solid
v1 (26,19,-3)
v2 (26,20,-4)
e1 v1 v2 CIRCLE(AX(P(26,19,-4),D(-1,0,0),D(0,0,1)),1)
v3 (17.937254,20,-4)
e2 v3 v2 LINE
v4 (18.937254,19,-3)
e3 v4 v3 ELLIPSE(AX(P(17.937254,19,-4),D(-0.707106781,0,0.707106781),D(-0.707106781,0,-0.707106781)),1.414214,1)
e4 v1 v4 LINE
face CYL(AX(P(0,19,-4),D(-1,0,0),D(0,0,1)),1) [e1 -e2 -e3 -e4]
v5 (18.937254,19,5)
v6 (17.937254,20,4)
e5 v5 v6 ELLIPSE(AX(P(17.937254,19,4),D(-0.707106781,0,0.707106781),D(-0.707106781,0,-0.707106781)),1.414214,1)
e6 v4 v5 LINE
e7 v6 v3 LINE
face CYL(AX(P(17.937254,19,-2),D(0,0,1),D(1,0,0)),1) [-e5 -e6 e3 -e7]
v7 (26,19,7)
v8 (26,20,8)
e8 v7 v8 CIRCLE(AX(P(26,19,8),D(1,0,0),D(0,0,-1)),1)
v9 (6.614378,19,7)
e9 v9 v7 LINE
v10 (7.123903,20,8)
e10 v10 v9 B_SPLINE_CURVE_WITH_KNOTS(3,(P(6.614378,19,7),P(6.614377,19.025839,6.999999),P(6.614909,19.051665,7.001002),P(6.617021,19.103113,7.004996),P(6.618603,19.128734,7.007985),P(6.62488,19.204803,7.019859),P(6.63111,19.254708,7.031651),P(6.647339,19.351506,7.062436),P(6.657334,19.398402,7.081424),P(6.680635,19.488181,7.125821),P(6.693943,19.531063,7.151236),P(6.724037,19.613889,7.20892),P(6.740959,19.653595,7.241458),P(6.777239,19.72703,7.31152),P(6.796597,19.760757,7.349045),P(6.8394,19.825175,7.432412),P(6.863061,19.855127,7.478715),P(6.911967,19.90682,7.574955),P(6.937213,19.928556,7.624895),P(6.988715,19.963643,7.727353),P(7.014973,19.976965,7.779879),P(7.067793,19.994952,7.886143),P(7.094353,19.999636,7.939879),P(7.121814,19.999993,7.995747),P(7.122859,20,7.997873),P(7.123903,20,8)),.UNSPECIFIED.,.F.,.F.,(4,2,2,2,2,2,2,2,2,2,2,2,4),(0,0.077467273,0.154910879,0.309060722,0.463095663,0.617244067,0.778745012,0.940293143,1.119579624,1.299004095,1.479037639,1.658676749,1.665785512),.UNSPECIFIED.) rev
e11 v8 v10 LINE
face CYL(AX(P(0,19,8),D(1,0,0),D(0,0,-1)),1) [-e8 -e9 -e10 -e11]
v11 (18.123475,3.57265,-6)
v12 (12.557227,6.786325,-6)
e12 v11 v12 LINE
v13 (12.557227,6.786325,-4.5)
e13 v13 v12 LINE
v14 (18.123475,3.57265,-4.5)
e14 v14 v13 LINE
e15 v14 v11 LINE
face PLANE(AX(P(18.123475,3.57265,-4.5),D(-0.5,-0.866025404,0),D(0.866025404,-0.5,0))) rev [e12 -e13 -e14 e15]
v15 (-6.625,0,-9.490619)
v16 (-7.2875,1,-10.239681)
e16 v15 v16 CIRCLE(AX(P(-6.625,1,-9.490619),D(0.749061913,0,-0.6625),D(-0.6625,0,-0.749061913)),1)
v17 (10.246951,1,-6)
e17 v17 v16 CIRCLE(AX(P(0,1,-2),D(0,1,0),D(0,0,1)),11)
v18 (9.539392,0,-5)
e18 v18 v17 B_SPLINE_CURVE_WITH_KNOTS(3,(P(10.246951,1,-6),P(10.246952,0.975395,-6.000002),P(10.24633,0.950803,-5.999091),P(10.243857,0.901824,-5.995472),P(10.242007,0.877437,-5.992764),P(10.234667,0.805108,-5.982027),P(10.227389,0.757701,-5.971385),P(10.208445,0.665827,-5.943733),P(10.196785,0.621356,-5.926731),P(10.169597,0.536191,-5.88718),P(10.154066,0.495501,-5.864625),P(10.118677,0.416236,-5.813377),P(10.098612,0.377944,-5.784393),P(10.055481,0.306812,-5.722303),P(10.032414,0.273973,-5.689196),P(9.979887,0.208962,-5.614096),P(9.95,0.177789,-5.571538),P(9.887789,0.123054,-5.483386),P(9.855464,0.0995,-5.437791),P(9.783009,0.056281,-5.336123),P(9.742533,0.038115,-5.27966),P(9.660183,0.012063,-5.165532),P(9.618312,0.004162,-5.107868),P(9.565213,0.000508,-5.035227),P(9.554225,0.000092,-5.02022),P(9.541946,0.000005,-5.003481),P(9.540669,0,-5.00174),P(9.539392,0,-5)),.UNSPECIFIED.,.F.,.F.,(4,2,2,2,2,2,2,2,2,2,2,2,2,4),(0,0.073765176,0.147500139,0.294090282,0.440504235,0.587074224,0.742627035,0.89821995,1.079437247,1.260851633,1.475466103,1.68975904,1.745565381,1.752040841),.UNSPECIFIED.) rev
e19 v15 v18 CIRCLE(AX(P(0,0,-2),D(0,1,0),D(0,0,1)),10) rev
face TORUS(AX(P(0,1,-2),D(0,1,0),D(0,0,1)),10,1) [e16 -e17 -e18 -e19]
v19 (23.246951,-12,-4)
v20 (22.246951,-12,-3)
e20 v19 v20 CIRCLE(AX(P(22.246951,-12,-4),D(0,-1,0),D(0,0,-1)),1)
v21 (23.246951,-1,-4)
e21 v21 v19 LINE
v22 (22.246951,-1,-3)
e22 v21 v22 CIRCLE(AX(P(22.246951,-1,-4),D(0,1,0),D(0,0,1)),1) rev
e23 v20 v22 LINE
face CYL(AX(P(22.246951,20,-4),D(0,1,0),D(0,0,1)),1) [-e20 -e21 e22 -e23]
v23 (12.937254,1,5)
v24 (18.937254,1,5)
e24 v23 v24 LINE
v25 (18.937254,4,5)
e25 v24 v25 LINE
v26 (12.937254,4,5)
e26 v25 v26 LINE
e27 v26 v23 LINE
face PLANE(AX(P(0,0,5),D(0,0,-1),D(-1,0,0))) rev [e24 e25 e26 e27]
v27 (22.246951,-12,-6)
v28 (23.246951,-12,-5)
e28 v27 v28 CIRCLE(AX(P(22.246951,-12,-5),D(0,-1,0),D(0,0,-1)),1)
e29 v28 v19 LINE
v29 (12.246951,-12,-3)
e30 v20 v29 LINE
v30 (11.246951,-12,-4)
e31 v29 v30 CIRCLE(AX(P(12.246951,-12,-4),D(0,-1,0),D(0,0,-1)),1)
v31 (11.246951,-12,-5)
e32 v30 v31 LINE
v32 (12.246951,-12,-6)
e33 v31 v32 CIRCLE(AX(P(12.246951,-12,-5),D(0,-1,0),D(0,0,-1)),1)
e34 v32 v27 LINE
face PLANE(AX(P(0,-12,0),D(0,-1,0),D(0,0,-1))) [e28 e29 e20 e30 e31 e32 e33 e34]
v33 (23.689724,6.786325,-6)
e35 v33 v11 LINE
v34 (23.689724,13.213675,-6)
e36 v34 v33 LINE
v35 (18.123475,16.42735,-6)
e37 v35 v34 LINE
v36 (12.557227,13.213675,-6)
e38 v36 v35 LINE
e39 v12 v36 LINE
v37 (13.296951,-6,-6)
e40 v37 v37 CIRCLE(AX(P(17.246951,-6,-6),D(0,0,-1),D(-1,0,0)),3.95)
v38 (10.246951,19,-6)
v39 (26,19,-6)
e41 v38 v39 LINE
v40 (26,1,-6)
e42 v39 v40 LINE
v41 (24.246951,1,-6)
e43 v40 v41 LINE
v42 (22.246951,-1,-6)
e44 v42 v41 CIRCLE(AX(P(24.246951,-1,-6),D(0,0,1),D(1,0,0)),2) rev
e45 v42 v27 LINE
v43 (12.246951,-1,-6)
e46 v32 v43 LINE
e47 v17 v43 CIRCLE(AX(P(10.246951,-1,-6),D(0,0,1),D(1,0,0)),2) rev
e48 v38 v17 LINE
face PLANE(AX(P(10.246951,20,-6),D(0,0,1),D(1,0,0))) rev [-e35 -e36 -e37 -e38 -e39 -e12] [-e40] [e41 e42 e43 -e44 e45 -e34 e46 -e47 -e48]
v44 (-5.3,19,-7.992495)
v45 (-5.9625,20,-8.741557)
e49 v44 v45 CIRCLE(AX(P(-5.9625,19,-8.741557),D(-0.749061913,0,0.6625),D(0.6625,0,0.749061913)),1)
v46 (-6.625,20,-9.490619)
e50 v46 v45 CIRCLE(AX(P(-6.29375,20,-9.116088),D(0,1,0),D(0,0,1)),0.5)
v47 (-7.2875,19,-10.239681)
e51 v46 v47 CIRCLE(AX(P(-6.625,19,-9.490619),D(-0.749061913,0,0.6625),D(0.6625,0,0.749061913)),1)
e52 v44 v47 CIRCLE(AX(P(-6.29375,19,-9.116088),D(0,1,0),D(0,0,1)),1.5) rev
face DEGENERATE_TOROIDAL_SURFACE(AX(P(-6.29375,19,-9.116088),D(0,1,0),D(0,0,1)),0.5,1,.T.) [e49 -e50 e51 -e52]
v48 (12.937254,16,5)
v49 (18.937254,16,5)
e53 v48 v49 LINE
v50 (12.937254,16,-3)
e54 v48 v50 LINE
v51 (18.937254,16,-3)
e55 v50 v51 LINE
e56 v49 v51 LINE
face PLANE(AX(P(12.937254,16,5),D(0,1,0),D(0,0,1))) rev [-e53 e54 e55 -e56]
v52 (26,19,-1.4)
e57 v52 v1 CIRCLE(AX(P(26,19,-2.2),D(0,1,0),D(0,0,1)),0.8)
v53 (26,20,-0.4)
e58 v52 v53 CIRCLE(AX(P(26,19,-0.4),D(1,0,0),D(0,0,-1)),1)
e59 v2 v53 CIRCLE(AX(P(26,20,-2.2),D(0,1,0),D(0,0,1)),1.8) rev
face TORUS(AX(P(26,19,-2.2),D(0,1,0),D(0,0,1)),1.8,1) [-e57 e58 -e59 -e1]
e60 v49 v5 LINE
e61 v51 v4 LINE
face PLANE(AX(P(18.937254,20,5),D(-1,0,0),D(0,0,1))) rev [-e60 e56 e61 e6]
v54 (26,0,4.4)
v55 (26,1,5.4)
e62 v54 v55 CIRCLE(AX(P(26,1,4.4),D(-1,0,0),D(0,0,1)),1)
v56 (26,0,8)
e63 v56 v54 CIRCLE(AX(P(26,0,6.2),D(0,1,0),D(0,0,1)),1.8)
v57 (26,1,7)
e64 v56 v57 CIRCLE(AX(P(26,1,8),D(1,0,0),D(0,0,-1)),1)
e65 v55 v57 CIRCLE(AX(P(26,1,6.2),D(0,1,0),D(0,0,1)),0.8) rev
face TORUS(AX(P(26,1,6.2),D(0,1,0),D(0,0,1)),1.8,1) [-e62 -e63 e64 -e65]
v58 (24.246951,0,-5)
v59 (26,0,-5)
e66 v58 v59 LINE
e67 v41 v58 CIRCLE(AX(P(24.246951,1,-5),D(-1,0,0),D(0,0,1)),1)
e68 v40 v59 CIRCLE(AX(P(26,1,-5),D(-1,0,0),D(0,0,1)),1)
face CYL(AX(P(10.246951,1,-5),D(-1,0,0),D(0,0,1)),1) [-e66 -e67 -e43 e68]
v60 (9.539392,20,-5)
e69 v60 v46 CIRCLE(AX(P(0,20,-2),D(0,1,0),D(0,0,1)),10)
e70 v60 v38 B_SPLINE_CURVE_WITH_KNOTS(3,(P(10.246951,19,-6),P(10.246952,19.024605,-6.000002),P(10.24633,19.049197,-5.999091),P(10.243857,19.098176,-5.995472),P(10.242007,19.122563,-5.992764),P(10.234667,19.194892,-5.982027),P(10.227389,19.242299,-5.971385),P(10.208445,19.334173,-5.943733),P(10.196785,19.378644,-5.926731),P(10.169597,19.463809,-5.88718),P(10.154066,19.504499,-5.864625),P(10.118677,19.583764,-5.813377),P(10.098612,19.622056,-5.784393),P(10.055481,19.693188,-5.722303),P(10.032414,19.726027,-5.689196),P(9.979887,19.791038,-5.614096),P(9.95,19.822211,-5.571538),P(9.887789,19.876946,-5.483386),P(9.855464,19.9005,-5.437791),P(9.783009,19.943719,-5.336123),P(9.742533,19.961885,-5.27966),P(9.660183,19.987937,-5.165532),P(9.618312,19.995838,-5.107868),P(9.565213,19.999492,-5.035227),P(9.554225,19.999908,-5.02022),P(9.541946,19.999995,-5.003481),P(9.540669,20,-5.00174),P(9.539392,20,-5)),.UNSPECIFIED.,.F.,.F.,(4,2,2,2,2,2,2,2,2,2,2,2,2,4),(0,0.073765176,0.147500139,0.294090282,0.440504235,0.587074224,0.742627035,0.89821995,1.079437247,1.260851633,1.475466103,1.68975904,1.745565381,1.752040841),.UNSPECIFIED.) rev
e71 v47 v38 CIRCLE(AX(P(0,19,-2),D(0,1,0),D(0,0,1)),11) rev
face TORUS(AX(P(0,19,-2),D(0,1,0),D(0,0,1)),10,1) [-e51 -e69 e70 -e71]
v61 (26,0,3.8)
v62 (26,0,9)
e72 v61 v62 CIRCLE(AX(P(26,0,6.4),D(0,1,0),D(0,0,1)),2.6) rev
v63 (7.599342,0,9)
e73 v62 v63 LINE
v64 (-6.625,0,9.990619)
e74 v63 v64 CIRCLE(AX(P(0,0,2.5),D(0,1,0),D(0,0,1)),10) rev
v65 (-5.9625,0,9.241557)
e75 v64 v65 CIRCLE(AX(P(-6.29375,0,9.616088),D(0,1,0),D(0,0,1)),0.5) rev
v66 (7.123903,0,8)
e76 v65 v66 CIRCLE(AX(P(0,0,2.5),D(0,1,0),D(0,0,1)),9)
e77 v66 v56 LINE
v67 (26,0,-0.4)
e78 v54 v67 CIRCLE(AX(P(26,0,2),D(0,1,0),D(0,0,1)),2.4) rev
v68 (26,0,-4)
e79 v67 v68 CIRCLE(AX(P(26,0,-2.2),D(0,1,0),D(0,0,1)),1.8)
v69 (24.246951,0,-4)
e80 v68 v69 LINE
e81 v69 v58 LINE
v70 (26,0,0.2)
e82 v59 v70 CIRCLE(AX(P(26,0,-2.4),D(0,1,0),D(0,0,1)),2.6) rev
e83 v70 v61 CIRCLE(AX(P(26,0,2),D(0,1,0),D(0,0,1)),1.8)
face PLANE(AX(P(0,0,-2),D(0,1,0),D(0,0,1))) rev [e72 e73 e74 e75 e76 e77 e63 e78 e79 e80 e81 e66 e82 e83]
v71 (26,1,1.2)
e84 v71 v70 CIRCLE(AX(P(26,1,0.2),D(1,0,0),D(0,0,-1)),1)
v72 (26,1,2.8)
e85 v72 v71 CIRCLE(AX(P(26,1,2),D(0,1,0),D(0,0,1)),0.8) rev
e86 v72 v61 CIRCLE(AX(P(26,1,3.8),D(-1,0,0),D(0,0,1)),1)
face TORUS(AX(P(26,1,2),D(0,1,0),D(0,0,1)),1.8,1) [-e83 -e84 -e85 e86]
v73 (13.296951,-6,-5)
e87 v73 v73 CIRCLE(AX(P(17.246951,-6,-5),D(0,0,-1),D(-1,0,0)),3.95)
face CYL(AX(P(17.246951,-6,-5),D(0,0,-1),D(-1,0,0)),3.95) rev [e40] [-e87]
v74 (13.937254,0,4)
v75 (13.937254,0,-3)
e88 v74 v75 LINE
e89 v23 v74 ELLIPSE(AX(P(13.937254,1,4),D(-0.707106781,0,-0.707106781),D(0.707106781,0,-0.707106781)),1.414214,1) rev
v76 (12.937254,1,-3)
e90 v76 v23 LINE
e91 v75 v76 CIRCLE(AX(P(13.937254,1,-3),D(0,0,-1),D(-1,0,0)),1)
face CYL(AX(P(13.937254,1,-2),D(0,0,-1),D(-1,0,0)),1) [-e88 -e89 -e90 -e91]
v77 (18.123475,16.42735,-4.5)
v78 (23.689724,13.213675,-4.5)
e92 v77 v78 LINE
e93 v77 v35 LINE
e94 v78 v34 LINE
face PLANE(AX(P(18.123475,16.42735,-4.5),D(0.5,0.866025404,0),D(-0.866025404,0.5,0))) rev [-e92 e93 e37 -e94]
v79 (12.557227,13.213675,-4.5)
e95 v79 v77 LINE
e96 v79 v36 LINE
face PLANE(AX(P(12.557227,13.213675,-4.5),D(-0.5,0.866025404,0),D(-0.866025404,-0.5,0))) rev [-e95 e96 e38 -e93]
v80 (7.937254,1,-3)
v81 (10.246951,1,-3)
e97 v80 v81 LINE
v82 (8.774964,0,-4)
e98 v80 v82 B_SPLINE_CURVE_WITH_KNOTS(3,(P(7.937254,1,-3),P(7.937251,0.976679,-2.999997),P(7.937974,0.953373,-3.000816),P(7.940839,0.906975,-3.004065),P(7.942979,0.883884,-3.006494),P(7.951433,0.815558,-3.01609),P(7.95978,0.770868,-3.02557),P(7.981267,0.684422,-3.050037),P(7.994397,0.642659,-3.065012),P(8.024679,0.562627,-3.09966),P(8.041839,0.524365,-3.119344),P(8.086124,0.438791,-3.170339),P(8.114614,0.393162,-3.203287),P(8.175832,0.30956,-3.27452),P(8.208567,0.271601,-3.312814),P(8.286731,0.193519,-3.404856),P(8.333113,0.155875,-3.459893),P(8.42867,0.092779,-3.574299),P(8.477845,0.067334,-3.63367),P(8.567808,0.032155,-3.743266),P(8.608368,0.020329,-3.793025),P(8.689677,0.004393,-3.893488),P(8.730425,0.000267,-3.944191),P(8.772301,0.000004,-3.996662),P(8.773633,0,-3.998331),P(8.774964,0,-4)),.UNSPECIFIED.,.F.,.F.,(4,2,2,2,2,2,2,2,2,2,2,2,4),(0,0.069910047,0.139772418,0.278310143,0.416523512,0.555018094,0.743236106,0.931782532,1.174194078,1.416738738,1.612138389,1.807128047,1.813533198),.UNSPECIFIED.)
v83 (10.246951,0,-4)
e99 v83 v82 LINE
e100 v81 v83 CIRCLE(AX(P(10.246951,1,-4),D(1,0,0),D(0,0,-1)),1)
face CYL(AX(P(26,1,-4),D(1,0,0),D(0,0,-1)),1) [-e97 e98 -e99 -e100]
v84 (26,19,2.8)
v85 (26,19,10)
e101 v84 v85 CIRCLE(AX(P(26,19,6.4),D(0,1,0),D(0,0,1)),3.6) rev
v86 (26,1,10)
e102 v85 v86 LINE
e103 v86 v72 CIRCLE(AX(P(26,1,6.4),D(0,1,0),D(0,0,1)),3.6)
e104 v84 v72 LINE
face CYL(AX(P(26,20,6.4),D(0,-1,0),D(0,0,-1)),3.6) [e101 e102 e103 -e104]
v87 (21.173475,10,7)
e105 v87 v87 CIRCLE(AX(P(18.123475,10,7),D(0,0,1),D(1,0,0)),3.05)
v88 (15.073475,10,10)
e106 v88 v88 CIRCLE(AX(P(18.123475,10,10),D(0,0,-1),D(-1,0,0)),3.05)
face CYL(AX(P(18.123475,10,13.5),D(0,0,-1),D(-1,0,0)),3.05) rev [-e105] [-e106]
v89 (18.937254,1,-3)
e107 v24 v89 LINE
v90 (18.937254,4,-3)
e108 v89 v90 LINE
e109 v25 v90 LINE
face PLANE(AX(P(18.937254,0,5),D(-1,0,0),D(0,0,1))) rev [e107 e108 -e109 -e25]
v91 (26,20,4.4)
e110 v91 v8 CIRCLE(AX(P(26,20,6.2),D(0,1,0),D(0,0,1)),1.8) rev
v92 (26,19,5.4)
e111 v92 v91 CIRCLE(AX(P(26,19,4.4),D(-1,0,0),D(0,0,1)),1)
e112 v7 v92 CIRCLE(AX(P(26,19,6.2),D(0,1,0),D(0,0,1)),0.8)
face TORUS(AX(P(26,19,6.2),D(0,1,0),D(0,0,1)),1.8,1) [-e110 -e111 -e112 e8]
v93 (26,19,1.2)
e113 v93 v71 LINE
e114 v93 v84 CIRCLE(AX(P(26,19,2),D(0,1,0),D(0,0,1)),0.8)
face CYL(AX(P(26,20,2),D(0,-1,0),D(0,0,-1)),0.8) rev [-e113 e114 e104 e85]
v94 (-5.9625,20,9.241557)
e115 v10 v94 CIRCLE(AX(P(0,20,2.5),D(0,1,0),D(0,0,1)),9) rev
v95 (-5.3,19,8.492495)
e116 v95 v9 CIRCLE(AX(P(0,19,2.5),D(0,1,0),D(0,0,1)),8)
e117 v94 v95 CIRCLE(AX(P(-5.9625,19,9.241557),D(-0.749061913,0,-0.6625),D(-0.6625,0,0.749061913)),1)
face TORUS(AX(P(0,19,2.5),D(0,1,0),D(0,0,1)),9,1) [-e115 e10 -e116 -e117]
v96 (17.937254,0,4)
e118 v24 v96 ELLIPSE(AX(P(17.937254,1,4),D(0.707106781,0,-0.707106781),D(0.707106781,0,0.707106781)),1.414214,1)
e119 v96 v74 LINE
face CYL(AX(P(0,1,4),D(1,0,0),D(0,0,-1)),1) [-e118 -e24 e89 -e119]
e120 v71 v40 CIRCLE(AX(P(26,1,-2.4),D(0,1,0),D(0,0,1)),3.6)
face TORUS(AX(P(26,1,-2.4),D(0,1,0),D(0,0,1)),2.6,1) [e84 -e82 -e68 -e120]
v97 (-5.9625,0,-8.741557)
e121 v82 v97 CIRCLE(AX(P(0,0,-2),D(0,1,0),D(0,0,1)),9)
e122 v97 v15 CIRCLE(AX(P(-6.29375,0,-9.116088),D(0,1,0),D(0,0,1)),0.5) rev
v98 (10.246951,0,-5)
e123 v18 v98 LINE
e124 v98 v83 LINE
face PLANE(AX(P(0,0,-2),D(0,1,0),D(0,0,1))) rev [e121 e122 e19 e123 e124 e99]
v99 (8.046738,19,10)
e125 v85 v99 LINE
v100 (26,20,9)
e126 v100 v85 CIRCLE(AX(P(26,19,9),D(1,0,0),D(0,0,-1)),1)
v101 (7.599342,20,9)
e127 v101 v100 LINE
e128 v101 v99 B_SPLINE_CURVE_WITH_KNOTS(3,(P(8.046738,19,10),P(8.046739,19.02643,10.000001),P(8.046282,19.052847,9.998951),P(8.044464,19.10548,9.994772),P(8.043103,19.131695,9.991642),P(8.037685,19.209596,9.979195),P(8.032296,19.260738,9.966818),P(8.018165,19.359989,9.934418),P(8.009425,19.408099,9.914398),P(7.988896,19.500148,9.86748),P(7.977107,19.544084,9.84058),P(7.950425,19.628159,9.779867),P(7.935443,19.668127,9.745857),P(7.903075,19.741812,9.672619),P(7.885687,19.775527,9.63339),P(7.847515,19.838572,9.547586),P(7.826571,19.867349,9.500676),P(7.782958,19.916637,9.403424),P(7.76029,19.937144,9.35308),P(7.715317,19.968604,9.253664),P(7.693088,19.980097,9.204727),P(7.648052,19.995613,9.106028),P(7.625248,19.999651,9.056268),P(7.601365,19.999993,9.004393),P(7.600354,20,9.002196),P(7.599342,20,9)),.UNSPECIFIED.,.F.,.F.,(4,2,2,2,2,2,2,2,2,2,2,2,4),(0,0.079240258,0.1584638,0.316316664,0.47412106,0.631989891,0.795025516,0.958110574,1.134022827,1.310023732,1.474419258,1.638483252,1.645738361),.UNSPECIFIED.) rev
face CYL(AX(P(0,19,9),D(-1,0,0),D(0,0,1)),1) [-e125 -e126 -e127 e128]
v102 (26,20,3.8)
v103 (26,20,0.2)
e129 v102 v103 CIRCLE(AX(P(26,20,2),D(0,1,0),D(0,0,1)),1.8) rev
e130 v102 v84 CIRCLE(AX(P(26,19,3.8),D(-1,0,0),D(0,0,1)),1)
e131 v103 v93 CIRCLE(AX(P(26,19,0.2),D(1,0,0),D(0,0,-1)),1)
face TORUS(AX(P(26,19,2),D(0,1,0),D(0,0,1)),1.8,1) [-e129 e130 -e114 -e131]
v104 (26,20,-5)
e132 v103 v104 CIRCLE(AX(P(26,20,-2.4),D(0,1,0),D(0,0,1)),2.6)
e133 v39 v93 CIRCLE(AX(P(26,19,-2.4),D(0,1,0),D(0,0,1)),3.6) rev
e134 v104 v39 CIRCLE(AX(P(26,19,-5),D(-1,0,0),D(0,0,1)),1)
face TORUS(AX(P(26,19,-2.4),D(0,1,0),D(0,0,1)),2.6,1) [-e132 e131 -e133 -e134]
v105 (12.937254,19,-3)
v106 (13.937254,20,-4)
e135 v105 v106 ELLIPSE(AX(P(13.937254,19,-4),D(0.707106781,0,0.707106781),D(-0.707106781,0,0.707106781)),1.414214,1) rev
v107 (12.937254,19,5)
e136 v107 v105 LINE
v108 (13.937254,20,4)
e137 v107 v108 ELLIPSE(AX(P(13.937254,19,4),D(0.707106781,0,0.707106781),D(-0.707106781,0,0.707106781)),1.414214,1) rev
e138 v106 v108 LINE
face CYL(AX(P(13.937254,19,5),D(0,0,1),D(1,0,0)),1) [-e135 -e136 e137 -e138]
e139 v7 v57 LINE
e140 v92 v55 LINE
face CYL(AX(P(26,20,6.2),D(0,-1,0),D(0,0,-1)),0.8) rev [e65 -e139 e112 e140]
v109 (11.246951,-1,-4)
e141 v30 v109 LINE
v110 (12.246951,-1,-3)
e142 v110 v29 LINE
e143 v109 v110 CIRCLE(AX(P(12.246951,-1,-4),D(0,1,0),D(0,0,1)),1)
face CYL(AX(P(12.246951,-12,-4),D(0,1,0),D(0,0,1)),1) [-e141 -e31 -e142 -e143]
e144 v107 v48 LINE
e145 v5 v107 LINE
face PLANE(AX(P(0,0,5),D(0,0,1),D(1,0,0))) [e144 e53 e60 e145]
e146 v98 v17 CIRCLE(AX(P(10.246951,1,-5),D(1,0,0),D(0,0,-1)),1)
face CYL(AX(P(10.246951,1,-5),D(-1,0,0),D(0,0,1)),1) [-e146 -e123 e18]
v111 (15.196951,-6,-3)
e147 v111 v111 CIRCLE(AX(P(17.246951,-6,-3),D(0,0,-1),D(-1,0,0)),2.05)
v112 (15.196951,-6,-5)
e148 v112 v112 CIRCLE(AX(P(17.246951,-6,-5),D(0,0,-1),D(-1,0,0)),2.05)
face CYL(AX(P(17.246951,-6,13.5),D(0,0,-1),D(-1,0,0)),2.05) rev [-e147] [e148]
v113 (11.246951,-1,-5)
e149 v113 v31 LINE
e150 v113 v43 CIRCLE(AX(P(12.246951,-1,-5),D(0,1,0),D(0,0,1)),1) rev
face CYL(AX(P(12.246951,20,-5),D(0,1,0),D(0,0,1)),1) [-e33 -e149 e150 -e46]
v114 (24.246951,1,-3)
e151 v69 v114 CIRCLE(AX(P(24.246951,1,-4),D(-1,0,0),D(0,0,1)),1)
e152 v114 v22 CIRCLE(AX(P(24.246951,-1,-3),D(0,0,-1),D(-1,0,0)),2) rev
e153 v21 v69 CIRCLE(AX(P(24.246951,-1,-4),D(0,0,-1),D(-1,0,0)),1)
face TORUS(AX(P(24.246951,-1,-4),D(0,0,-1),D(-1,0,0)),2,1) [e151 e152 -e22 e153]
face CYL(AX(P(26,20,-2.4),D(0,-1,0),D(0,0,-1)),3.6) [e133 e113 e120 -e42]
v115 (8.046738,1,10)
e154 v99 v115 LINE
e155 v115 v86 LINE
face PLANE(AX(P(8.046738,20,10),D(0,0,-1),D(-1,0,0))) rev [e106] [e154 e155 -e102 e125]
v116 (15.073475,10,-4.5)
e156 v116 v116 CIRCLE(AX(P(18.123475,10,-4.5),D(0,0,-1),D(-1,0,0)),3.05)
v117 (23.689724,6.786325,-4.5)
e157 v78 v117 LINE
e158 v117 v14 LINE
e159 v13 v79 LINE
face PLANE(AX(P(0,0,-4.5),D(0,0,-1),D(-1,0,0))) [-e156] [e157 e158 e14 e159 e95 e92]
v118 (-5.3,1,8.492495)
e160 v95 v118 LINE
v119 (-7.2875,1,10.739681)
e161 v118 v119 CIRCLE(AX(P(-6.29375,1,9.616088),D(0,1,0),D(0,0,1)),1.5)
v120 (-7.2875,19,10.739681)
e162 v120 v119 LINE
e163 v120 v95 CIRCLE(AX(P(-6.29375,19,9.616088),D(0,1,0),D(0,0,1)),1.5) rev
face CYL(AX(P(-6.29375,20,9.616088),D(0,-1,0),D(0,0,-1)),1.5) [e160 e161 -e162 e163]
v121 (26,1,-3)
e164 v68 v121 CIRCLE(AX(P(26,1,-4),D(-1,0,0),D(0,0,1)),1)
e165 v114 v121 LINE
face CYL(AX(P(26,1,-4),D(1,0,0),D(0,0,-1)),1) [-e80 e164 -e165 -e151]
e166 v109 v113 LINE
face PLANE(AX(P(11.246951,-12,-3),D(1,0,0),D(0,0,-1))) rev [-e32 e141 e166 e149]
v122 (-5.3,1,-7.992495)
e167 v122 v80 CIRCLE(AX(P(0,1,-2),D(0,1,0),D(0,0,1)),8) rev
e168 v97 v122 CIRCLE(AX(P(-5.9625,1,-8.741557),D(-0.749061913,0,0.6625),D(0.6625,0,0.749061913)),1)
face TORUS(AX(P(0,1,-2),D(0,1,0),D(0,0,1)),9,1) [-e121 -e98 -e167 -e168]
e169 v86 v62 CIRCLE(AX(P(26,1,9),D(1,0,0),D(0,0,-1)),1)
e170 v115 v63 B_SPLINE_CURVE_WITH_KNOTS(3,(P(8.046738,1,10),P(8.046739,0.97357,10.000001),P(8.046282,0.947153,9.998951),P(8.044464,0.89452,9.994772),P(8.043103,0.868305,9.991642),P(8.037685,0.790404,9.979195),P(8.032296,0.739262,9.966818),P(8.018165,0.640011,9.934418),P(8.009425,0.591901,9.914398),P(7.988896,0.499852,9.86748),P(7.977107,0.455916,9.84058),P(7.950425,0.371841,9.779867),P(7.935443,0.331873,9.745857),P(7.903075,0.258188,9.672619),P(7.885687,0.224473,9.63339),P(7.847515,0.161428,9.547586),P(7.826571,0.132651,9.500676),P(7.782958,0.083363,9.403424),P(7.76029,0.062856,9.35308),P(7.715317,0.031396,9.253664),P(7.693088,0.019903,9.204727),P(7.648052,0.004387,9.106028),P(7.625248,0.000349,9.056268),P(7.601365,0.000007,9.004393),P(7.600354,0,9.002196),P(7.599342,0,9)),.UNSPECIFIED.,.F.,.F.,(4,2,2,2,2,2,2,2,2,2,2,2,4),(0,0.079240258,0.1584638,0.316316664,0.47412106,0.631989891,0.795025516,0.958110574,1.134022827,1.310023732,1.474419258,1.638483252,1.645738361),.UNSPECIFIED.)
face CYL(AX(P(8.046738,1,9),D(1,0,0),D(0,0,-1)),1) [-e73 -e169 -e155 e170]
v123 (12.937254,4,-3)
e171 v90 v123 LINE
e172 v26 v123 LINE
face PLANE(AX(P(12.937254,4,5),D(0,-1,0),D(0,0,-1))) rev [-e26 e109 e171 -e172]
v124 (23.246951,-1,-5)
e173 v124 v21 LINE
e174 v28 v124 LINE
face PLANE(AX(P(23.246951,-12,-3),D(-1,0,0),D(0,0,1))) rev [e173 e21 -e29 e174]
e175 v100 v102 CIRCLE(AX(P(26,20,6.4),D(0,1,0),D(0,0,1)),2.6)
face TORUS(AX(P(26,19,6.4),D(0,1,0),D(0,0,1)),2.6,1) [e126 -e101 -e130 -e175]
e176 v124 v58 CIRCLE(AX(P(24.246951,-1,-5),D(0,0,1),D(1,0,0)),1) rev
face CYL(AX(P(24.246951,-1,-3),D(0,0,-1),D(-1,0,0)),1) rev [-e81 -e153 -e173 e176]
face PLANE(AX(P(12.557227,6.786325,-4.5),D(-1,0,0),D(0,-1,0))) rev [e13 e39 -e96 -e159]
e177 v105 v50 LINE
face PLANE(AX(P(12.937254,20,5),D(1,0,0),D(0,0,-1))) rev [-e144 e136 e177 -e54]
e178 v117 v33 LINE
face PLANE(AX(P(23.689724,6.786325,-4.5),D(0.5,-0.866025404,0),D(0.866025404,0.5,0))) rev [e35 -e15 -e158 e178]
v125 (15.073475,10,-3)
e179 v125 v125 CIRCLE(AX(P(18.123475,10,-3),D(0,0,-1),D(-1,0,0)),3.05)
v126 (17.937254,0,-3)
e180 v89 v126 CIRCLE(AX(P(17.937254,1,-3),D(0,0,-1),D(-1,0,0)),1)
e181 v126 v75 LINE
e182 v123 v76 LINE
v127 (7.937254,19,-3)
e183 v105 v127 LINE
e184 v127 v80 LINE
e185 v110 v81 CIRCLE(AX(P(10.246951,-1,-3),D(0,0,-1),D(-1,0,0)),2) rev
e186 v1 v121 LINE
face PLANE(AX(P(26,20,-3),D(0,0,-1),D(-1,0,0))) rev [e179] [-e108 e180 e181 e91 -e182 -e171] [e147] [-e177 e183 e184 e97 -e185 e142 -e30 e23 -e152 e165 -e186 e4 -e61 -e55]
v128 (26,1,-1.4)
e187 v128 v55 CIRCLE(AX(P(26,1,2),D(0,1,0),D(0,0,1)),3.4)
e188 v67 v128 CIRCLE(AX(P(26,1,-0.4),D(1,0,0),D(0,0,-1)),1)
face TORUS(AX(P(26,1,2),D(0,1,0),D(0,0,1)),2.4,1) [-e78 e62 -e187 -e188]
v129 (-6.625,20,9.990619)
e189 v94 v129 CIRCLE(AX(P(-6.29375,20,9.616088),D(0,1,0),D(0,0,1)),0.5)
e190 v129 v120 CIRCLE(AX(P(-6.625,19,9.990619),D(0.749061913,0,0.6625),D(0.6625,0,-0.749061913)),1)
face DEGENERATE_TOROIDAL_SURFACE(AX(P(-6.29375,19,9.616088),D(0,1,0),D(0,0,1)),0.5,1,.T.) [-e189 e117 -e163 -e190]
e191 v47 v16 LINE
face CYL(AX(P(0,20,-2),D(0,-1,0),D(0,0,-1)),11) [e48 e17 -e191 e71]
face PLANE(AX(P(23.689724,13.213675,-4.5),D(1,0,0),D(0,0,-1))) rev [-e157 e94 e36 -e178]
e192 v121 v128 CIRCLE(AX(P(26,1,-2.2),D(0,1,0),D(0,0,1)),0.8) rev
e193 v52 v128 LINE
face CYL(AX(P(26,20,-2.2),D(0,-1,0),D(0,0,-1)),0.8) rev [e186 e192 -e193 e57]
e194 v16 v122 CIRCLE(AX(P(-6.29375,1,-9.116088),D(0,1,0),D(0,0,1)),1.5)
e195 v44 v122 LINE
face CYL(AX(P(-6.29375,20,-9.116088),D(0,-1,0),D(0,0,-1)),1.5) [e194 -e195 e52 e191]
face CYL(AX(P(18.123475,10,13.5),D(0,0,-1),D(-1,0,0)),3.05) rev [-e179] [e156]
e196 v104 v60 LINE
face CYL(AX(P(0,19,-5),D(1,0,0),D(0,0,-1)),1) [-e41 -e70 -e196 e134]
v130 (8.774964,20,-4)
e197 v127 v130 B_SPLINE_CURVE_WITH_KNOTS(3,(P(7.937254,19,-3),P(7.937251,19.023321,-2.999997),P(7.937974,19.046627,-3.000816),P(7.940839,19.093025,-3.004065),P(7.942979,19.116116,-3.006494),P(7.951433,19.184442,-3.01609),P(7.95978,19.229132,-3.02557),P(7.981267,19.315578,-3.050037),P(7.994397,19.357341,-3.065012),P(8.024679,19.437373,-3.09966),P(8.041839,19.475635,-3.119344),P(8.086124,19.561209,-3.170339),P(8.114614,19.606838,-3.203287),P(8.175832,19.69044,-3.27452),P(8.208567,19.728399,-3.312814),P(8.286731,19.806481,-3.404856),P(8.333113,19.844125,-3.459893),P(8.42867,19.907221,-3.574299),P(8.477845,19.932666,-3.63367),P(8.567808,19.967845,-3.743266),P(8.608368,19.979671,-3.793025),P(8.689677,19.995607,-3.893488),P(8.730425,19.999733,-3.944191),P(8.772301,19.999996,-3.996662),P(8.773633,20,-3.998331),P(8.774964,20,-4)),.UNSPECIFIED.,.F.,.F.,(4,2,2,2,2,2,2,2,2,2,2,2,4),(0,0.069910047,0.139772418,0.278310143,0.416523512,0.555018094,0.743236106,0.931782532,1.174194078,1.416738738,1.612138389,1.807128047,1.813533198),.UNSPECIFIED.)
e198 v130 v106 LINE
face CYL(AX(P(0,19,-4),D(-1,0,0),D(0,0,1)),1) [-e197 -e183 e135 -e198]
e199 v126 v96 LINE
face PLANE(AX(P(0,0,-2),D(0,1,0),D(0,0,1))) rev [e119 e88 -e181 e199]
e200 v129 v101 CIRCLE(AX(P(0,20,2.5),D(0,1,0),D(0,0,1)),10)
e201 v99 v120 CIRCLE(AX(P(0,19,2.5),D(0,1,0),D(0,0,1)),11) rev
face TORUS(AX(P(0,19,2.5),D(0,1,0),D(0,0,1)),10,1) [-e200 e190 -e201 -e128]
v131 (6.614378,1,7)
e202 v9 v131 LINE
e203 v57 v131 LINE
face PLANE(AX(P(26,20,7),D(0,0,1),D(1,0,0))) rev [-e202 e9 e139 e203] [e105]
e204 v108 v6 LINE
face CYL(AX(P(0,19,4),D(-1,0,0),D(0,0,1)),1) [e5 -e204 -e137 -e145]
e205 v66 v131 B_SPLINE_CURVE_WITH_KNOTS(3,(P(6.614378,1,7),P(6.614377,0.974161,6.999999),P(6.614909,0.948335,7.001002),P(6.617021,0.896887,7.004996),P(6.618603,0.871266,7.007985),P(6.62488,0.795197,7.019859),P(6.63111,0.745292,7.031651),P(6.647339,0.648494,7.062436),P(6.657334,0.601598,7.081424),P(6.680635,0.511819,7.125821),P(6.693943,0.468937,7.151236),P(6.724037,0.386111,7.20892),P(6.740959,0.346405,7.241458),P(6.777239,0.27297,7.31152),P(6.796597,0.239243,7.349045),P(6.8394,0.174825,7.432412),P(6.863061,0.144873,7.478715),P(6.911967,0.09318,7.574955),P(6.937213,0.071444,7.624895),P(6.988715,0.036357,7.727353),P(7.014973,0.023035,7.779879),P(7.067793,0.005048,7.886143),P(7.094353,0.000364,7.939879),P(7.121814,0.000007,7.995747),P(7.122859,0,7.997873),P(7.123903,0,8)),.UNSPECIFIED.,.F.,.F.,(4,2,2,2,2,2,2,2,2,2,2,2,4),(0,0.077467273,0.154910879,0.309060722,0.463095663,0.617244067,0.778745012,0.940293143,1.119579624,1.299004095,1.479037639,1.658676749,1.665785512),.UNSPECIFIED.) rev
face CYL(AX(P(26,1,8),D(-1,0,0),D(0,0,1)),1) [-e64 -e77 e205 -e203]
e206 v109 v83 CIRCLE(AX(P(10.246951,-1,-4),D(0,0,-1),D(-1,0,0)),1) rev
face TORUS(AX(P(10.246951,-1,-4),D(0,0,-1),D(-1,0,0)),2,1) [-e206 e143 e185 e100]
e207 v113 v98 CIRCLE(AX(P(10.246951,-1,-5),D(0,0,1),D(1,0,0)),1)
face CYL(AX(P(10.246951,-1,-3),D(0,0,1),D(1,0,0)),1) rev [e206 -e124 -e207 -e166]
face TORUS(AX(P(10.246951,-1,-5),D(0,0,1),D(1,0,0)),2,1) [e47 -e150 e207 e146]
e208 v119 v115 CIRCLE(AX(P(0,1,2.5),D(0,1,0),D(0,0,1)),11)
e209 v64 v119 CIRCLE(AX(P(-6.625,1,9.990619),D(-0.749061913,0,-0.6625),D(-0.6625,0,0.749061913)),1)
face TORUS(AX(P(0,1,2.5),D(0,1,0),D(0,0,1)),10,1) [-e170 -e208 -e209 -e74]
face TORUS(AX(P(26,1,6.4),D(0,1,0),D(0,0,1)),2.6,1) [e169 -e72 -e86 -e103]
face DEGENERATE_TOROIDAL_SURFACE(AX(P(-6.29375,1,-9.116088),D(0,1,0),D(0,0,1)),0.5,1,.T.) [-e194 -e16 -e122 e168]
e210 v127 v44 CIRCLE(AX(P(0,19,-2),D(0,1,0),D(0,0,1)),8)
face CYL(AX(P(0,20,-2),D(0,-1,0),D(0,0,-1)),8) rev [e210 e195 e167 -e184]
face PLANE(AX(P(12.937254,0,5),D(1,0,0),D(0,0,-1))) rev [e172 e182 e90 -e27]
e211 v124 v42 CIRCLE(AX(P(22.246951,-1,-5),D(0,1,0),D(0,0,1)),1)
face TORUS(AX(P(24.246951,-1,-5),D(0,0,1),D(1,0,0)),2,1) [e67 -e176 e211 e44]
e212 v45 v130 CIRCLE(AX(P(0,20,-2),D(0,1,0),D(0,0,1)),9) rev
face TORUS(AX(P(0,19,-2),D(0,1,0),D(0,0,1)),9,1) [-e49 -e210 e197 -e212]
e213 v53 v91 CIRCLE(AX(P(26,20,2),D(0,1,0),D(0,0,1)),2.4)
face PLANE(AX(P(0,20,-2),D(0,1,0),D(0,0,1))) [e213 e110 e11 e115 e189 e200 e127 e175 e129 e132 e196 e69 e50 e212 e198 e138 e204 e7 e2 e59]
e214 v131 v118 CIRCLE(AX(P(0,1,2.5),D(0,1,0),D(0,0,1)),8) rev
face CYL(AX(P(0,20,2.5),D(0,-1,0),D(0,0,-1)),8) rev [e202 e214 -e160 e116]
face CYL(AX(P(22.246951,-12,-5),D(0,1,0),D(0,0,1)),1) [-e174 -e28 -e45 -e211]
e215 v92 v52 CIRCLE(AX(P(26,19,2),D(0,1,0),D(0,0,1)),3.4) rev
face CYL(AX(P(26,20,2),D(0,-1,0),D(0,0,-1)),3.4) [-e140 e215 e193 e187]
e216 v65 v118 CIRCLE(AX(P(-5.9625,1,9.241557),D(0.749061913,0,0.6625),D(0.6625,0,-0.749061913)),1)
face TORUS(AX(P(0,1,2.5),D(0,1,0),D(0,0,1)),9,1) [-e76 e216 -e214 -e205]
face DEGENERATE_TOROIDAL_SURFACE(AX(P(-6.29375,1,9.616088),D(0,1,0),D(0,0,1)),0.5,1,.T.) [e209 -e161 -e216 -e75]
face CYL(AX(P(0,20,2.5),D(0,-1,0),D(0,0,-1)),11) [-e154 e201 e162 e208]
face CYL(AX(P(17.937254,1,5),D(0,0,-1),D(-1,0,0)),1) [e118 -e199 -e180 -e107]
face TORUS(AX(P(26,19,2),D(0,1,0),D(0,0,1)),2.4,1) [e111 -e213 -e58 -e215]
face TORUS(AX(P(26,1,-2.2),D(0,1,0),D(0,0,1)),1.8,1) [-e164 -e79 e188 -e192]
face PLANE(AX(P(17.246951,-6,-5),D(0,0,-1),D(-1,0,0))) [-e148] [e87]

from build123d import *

# Parameters (mm, degrees)
BOSS_EXTRUDE1_DEPTH = 20
CUT_EXTRUDE1_DEPTH  = 1.5
SKETCH3_R           = 3.05
CUT_EXTRUDE2_DEPTH  = 41.00199995
SKETCH4_W           = 6
SKETCH4_H           = 4
BOSS_EXTRUDE2_DEPTH = 8
FILLET1_R           = 1
SKETCH6_W           = 12
SKETCH6_H           = 3
BOSS_EXTRUDE3_DEPTH = 12
SKETCH7_R           = 3.95
CUT_EXTRUDE3_DEPTH  = 1
SKETCH8_R           = 2.05
CUT_EXTRUDE4_DEPTH  = 41.229466908
FILLET3_R           = 1
FILLET4_R           = 1
FILLET6_R           = 1


with BuildPart() as part:
    # Sketch1 → Boss-Extrude1 (new body)
    with BuildSketch(Plane(origin=(0, 0, 0), x_dir=(1, 0, 0), z_dir=(0, 1, 0))):
        with BuildLine():
            Line((26, 3), (7.937253933, 3))
            ThreePointArc((7.937253933, 3), (2.823124054, 9.485316999), (-5.3, 7.992495307))
            ThreePointArc((-5.3, 7.992495307), (-7.41734287, 8.122338177), (-7.2875, 10.239681047))
            ThreePointArc((-7.2875, 10.239681047), (2.58521006, 12.691898285), (10.246950766, 6))
            Line((10.246950766, 6), (26, 6))
            ThreePointArc((26, 6), (29.6, 2.4), (26, -1.2))
            ThreePointArc((26, -1.2), (25.2, -2), (26, -2.8))
            ThreePointArc((26, -2.8), (29.6, -6.4), (26, -10))
            Line((26, -10), (8.04673847, -10))
            ThreePointArc((8.04673847, -10), (0.529993185, -13.487224728), (-7.2875, -10.739681047))
            ThreePointArc((-7.2875, -10.739681047), (-7.41734287, -8.622338177), (-5.3, -8.492495307))
            ThreePointArc((-5.3, -8.492495307), (0.994375746, -10.437960498), (6.614378278, -7))
            Line((6.614378278, -7), (26, -7))
            ThreePointArc((26, -7), (26.8, -6.2), (26, -5.4))
            ThreePointArc((26, -5.4), (22.6, -2), (26, 1.4))
            ThreePointArc((26, 1.4), (26.8, 2.2), (26, 3))
        make_face()
    extrude(amount=BOSS_EXTRUDE1_DEPTH)

    # Sketch2 → Cut-Extrude1 (cut)
    with BuildSketch(Plane(origin=(0, 0, -6), x_dir=(-1, 0, 0), z_dir=(0, 0, -1))):
        Polygon((-18.123475383, 3.572649731), (-12.557226771, 6.786324865), (-12.557226771, 13.213675135), (-18.123475383, 16.427350269), (-23.689723995, 13.213675135), (-23.689723995, 6.786324865), align=None)
    extrude(amount=-CUT_EXTRUDE1_DEPTH, mode=Mode.SUBTRACT)

    # Sketch3 → Cut-Extrude2 (cut, through all)
    with BuildSketch(Plane(origin=(0, 0, -4.5), x_dir=(-1, 0, 0), z_dir=(0, 0, -1))):
        with Locations((-18.123475383, 10)):
            Circle(SKETCH3_R)
    extrude(amount=-CUT_EXTRUDE2_DEPTH, mode=Mode.SUBTRACT)

    # Sketch4 → Boss-Extrude2 (add)
    with BuildSketch(Plane.XY.offset(-3)):
        with Locations((15.937253933, 18)):
            Rectangle(SKETCH4_W, SKETCH4_H)
        with Locations((15.937253933, 2)):
            Rectangle(SKETCH4_W, SKETCH4_H)
    extrude(amount=BOSS_EXTRUDE2_DEPTH)

    # Fillet1
    fillet1_edges = [part.edges().sort_by_distance(p)[0] for p in [
        (26.8, 20, -2.2),
        (22.6, 20, 2),
        (26.8, 20, 6.2),
        (16.307189139, 20, 7),
        (0.994375746, 20, 10.437960498),
        (-7.41734287, 20, 8.622338177),
        (0.529993185, 20, 13.487224728),
        (17.023369235, 20, 10),
        (29.6, 20, 6.4),
        (25.2, 20, 2),
        (2.823124054, 20, -9.485316999),
        (29.6, 20, -2.4),
        (18.123475383, 20, -6),
        (2.58521006, 20, -12.691898285),
        (-7.41734287, 20, -8.122338177),
        (10.437253933, 20, -3),
        (22.468626967, 20, -3),
        (12.937253933, 20, 1),
        (18.937253933, 20, 1),
        (15.937253933, 20, 5),
    ]]
    fillet(fillet1_edges, radius=FILLET1_R)

    # Sketch6 → Boss-Extrude3 (add)
    with BuildSketch(Plane.XZ):
        with Locations((17.246950766, -4.5)):
            Rectangle(SKETCH6_W, SKETCH6_H)
    extrude(amount=BOSS_EXTRUDE3_DEPTH)

    # Sketch7 → Cut-Extrude3 (cut)
    with BuildSketch(Plane(origin=(0, 0, -6), x_dir=(-1, 0, 0), z_dir=(0, 0, -1))):
        with Locations((-17.246950766, -6)):
            Circle(SKETCH7_R)
    extrude(amount=-CUT_EXTRUDE3_DEPTH, mode=Mode.SUBTRACT)

    # Sketch8 → Cut-Extrude4 (cut, through all)
    with BuildSketch(Plane(origin=(0, 0, -5), x_dir=(-1, 0, 0), z_dir=(0, 0, -1))):
        with Locations((-17.246950766, -6)):
            Circle(SKETCH8_R)
    extrude(amount=-CUT_EXTRUDE4_DEPTH, mode=Mode.SUBTRACT)

    # Fillet3
    fillet3_edges = [part.edges().sort_by_distance(p)[0] for p in [
        (-7.41734287, 0, -8.122338177),
        (2.58521006, 0, -12.691898285),
        (10.746950766, 0, -6),
        (11.246950766, 0, -4.5),
        (11.246950766, -6, -3),
        (11.246950766, -6, -6),
        (9.59210235, 0, -3),
        (2.823124054, 0, -9.485316999),
    ]]
    fillet(fillet3_edges, radius=FILLET3_R - 0.0001)  # a hair under: the kernel refuses the full size

    # Fillet4
    fillet4_edges = [part.edges().sort_by_distance(p)[0] for p in [
        (24.623475383, 0, -6),
        (29.6, 0, -2.4),
        (24.623475383, 0, -3),
        (25.2, 0, 2),
        (23.246950766, 0, -4.5),
        (23.246950766, -6, -6),
        (23.246950766, -6, -3),
        (29.6, 0, 6.4),
        (17.023369235, 0, 10),
        (0.529993185, 0, 13.487224728),
        (-7.41734287, 0, 8.622338177),
        (0.994375746, 0, 10.437960498),
        (16.307189139, 0, 7),
        (26.8, 0, 6.2),
        (22.6, 0, 2),
        (26.8, 0, -2.2),
    ]]
    fillet(fillet4_edges, radius=FILLET4_R)

    # Fillet6
    fillet6_edges = [part.edges().sort_by_distance(p)[0] for p in [
        (18.937253933, 0, 1),
        (12.937253933, 0, 1),
        (15.937253933, 0, 5),
    ]]
    fillet(fillet6_edges, radius=FILLET6_R)


solid = part.part
